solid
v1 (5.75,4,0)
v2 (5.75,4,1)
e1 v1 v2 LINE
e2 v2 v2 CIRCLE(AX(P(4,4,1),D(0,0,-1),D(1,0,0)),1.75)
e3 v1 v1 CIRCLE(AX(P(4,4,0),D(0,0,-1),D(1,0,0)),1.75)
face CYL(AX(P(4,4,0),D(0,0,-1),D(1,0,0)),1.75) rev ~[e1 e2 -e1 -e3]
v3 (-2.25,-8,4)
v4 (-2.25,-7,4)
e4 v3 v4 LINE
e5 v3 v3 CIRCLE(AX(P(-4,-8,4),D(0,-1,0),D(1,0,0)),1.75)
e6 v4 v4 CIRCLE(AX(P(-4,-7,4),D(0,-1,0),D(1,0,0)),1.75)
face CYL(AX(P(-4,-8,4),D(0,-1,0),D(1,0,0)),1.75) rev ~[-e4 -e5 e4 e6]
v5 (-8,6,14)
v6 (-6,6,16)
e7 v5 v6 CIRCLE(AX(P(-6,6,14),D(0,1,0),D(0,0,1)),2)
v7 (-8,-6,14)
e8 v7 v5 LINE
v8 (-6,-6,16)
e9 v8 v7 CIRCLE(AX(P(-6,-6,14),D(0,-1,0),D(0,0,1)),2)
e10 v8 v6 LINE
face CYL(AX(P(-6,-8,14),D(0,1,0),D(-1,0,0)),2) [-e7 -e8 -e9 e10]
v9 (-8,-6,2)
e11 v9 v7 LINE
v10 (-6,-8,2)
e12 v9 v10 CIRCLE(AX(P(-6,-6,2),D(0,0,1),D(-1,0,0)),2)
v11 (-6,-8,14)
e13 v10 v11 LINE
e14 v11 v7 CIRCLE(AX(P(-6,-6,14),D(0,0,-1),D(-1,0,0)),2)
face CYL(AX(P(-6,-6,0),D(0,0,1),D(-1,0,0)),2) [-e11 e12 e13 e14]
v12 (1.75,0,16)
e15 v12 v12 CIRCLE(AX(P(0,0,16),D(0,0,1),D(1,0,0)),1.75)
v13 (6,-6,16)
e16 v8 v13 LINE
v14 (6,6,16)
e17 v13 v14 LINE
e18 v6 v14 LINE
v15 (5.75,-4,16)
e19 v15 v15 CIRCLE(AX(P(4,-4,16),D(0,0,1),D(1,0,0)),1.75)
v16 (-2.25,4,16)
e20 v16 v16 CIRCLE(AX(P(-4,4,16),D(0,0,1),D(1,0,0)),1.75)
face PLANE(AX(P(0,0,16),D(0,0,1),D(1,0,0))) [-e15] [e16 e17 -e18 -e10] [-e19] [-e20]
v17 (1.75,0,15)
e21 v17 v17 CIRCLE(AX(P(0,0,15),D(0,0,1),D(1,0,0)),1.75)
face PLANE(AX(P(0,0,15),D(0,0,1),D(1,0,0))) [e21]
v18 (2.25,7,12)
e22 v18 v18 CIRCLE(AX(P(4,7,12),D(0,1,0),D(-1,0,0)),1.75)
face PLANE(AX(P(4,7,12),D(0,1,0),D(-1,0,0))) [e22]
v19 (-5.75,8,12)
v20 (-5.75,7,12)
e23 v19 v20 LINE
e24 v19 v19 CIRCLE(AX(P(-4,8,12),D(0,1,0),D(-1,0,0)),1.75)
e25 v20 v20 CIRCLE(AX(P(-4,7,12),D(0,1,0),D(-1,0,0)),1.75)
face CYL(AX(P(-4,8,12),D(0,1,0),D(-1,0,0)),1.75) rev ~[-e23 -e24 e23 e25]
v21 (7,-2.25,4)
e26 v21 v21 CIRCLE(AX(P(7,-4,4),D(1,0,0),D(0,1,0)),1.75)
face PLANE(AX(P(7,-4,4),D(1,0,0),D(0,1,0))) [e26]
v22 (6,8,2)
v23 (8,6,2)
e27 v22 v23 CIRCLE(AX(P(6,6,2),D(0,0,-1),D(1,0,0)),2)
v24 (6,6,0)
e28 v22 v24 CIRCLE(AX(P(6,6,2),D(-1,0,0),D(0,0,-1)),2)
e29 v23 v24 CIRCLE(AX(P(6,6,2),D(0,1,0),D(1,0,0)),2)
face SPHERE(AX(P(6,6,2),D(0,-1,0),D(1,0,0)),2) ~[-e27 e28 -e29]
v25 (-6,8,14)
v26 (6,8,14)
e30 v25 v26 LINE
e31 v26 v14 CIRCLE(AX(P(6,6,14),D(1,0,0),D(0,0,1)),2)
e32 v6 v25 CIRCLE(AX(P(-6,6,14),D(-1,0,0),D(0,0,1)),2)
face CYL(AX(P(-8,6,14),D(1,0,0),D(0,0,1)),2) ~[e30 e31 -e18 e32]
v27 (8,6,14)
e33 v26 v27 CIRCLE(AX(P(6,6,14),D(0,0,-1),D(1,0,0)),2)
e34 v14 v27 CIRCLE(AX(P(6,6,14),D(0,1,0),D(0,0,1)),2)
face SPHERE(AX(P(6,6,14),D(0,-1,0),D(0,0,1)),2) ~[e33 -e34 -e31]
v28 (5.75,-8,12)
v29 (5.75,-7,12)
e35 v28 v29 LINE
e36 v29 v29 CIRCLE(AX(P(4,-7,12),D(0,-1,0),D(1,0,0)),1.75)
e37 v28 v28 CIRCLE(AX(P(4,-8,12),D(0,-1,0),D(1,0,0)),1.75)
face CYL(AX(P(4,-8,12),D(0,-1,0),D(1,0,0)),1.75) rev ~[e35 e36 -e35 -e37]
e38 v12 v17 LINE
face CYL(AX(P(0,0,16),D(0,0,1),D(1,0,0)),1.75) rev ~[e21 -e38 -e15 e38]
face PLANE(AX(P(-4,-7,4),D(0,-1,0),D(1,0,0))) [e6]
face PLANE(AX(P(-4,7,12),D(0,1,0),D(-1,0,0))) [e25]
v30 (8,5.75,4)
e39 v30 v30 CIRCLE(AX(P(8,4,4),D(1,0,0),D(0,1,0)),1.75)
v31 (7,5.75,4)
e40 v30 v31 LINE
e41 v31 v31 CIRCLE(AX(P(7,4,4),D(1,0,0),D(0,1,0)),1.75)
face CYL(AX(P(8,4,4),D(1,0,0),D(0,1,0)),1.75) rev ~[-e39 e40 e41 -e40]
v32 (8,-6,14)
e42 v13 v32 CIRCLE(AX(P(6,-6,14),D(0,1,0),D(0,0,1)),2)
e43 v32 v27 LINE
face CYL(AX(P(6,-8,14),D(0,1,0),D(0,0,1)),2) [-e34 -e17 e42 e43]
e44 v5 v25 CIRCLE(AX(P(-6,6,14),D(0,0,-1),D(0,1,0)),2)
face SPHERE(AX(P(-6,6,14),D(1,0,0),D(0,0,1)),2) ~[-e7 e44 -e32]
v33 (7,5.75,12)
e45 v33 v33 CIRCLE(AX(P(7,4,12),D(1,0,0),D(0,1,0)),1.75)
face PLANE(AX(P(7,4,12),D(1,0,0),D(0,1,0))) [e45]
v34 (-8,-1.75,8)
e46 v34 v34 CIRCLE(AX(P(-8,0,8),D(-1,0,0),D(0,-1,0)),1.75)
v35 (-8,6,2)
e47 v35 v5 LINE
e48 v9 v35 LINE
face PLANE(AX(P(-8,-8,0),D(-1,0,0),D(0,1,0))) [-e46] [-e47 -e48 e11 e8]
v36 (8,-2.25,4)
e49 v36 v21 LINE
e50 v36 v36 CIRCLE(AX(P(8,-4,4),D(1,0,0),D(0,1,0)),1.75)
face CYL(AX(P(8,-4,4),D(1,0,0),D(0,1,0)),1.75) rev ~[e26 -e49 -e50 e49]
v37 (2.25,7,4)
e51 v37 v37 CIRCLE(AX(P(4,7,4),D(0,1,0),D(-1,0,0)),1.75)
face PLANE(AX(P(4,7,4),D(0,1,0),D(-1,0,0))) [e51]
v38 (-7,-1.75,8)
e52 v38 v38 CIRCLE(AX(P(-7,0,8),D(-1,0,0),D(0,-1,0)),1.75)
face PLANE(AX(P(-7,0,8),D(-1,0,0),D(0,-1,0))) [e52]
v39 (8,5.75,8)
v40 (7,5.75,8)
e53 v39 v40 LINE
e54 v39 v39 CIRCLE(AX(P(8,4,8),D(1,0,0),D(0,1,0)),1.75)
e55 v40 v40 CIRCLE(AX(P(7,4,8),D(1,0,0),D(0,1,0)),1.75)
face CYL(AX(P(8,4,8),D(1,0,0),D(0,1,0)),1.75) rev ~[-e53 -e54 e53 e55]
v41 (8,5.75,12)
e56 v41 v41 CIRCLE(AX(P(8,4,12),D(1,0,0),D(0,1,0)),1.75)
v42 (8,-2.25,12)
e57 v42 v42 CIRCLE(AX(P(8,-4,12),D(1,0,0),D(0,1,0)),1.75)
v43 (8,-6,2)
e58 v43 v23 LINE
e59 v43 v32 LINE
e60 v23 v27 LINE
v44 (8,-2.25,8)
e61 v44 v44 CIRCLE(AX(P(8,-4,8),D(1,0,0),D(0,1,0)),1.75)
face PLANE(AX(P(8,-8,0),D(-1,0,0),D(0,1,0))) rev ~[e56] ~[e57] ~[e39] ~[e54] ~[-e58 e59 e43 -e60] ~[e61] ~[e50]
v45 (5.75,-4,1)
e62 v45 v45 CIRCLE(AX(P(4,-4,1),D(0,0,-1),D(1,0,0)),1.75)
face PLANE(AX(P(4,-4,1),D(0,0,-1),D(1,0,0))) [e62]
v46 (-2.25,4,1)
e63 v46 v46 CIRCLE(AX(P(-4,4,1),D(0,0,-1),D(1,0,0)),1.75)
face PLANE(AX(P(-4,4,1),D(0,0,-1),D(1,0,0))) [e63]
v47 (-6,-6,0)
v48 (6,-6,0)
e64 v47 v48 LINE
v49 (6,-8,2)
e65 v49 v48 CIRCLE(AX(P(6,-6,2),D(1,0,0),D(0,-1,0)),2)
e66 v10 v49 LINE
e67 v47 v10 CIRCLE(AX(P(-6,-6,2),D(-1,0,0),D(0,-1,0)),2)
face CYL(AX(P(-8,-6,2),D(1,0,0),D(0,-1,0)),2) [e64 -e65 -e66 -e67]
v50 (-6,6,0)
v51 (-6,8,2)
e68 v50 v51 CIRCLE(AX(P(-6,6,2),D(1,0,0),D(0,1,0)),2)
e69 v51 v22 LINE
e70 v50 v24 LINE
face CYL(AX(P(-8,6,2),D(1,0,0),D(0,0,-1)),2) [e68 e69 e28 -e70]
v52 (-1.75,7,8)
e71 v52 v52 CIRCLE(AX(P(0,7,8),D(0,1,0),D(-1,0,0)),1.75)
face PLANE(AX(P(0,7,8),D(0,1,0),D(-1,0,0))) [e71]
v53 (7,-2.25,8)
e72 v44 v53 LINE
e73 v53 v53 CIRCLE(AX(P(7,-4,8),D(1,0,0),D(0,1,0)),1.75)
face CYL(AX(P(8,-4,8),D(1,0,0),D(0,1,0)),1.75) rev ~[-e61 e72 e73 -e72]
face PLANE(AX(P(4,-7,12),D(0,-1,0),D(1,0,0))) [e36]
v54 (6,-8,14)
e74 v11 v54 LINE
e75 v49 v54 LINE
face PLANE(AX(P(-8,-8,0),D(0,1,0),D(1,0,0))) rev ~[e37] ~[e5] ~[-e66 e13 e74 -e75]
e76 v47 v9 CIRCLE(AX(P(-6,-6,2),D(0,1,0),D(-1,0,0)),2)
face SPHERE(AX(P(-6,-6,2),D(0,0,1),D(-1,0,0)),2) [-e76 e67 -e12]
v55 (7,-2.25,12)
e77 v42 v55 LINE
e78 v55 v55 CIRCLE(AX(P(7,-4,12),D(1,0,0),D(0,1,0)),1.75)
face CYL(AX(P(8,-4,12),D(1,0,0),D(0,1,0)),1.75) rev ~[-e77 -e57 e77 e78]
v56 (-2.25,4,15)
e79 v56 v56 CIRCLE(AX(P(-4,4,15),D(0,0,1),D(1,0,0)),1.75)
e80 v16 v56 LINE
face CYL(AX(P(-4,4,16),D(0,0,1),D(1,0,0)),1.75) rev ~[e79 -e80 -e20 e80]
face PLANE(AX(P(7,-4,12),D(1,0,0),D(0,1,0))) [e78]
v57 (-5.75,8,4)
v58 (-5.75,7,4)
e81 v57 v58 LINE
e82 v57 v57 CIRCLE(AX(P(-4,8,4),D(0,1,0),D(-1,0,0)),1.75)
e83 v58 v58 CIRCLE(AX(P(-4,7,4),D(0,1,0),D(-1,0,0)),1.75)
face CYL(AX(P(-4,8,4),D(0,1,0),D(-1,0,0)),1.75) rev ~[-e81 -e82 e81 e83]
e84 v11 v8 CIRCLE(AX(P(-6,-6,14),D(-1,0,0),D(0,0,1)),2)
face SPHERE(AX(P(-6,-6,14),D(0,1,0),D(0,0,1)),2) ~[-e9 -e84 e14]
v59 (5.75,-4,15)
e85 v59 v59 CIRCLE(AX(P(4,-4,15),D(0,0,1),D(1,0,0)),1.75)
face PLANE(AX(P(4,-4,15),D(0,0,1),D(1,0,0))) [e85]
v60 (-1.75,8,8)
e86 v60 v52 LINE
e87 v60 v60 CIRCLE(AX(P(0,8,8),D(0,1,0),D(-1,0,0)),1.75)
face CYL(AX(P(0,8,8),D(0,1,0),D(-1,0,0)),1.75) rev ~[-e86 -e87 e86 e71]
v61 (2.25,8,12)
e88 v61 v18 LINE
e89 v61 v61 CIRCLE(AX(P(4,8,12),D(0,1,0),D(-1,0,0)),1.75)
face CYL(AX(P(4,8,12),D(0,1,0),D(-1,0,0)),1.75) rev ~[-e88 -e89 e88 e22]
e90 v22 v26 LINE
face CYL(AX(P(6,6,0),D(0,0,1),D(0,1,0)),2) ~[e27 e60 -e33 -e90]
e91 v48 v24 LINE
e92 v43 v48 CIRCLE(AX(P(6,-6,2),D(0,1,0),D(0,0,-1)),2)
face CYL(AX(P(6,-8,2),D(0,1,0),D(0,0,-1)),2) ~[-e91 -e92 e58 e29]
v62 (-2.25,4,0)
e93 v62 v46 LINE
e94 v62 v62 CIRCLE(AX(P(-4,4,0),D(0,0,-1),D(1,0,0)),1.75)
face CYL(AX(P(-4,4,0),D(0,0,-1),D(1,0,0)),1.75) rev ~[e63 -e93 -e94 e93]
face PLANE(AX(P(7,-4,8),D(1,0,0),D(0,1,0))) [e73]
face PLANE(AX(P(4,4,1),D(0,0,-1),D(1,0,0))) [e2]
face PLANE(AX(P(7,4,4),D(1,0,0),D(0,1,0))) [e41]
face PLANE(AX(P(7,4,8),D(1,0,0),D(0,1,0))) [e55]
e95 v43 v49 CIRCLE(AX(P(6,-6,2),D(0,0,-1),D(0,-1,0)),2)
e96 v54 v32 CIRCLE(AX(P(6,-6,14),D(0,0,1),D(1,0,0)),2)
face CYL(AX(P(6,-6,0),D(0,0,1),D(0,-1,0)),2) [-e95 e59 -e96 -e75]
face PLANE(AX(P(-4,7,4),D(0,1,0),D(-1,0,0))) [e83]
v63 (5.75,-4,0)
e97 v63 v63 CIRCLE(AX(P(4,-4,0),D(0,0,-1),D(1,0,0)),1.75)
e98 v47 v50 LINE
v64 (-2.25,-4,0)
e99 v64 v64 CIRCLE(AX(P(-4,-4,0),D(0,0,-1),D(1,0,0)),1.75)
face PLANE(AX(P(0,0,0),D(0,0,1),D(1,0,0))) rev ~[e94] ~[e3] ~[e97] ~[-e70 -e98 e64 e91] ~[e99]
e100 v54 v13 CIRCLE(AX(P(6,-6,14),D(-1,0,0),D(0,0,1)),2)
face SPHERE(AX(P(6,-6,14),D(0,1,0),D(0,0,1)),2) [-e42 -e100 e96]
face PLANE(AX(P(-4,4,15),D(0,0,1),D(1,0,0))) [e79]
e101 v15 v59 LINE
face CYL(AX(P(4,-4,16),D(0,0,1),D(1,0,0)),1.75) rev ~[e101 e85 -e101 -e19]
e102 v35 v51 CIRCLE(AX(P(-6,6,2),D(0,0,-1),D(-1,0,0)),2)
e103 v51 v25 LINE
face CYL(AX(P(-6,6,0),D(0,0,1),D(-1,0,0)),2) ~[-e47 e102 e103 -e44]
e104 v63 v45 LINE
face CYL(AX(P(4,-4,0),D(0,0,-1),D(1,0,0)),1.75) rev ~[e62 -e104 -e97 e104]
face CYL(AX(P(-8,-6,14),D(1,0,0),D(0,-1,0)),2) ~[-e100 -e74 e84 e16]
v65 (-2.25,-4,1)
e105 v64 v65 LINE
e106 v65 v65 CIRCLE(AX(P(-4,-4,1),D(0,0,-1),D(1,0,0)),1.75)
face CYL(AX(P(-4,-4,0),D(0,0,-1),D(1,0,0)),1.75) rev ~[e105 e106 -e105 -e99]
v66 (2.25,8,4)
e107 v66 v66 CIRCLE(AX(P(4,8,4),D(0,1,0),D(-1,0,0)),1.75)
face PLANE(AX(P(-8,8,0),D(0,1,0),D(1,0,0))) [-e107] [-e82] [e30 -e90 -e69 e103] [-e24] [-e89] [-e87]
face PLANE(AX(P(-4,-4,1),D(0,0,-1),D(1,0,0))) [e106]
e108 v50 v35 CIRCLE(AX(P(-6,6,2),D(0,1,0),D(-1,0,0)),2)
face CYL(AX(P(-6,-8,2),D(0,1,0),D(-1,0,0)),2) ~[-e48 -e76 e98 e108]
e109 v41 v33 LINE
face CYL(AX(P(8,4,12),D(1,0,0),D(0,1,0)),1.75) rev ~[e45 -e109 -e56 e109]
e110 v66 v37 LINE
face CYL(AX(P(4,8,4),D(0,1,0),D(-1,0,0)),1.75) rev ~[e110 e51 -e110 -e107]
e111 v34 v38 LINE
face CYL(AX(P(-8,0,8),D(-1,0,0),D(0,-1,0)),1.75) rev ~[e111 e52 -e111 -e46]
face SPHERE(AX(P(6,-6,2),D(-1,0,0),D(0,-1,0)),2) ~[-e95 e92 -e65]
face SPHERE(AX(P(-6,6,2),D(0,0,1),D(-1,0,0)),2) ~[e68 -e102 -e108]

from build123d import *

# Parameters (mm, degrees)
F0_W      = 16
F0_H      = 16
F1_DEPTH  = 16
F2_R      = 1.75
F3_DEPTH  = 1
F4_DEPTH  = 1
F5_R      = 1.75
F6_DEPTH  = 1
F7_R      = 1.75
F8_DEPTH  = 1
F9_R      = 1.75
F10_DEPTH = 1
F11_R     = 1.75
F12_DEPTH = 1
F13_R     = 1.75
F14_DEPTH = 1
F15_R     = 2


# Not quite as in the source:
# - a feature names something its author has since deleted; it is built from what else it names


with BuildPart() as f1:
    # F0 (on Top) → F1 (new body)
    with BuildSketch(Plane.XY):
        Rectangle(F0_W, F0_H)
    extrude(amount=F1_DEPTH)

    # F2 (on face) → F3 (cut)
    with BuildSketch(Plane(origin=(0, 8, 0), x_dir=(-1, 0, 0), z_dir=(0, 1, 0))):
        with Locations((4, 12)):
            Circle(F2_R)
        with Locations((-4, 4)):
            Circle(F2_R)
    extrude(amount=-F3_DEPTH, mode=Mode.SUBTRACT)

    # F2 (on face) → F4 (cut)
    with BuildSketch(Plane(origin=(0, 8, 0), x_dir=(-1, 0, 0), z_dir=(0, 1, 0))):
        with Locations((-4, 12)):
            Circle(F2_R)
        with Locations((0, 8)):
            Circle(F2_R)
        with Locations((4, 4)):
            Circle(F2_R)
    extrude(amount=-F4_DEPTH, mode=Mode.SUBTRACT)

    # F5 (on face) → F6 (cut)
    with BuildSketch(Plane.XZ.offset(8)):
        with Locations((-4, 4)):
            Circle(F5_R)
        with Locations((4, 12)):
            Circle(F5_R)
    extrude(amount=-F6_DEPTH, mode=Mode.SUBTRACT)

    # F7 (on face) → F8 (cut)
    with BuildSketch(Plane.XY.offset(16)):
        Circle(F7_R)
        with Locations((4, -4)):
            Circle(F7_R)
        with Locations((-4, 4)):
            Circle(F7_R)
    extrude(amount=-F8_DEPTH, mode=Mode.SUBTRACT)

    # F9 (on face) → F10 (cut)
    with BuildSketch(Plane.YZ.offset(8)):
        with Locations((-4, 12)):
            Circle(F9_R)
        with Locations((-4, 4)):
            Circle(F9_R)
        with Locations((4, 4)):
            Circle(F9_R)
        with Locations((4, 8)):
            Circle(F9_R)
        with Locations((4, 12)):
            Circle(F9_R)
        with Locations((-4, 8)):
            Circle(F9_R)
    extrude(amount=-F10_DEPTH, mode=Mode.SUBTRACT)

    # F11 (on face) → F12 (cut)
    with BuildSketch(Plane(origin=(0, 0, 0), x_dir=(1, 0, 0), z_dir=(0, 0, -1))):
        with Locations((4, -4)):
            Circle(F11_R)
        with Locations((-4, 4)):
            Circle(F11_R)
        with Locations((4, 4)):
            Circle(F11_R)
        with Locations((-4, -4)):
            Circle(F11_R)
    extrude(amount=-F12_DEPTH, mode=Mode.SUBTRACT)

    # F13 (on face) → F14 (cut)
    with BuildSketch(Plane(origin=(-8, 0, 0), x_dir=(0, -1, 0), z_dir=(-1, 0, 0))):
        with Locations((0, 8)):
            Circle(F13_R)
    extrude(amount=-F14_DEPTH, mode=Mode.SUBTRACT)

    # F15
    f15_edges = [f1.edges().sort_by_distance(p)[0] for p in [
        (8, 0, 16),
        (0, 8, 16),
        (-8, 0, 16),
        (0, -8, 16),
        (-8, -8, 8),
        (-8, 8, 8),
        (-8, 0, 0),
        (0, -8, 0),
        (8, -8, 8),
        (8, 0, 0),
        (8, 8, 8),
        (0, 8, 0),
    ]]
    fillet(f15_edges, radius=F15_R)


solid = f1.part
